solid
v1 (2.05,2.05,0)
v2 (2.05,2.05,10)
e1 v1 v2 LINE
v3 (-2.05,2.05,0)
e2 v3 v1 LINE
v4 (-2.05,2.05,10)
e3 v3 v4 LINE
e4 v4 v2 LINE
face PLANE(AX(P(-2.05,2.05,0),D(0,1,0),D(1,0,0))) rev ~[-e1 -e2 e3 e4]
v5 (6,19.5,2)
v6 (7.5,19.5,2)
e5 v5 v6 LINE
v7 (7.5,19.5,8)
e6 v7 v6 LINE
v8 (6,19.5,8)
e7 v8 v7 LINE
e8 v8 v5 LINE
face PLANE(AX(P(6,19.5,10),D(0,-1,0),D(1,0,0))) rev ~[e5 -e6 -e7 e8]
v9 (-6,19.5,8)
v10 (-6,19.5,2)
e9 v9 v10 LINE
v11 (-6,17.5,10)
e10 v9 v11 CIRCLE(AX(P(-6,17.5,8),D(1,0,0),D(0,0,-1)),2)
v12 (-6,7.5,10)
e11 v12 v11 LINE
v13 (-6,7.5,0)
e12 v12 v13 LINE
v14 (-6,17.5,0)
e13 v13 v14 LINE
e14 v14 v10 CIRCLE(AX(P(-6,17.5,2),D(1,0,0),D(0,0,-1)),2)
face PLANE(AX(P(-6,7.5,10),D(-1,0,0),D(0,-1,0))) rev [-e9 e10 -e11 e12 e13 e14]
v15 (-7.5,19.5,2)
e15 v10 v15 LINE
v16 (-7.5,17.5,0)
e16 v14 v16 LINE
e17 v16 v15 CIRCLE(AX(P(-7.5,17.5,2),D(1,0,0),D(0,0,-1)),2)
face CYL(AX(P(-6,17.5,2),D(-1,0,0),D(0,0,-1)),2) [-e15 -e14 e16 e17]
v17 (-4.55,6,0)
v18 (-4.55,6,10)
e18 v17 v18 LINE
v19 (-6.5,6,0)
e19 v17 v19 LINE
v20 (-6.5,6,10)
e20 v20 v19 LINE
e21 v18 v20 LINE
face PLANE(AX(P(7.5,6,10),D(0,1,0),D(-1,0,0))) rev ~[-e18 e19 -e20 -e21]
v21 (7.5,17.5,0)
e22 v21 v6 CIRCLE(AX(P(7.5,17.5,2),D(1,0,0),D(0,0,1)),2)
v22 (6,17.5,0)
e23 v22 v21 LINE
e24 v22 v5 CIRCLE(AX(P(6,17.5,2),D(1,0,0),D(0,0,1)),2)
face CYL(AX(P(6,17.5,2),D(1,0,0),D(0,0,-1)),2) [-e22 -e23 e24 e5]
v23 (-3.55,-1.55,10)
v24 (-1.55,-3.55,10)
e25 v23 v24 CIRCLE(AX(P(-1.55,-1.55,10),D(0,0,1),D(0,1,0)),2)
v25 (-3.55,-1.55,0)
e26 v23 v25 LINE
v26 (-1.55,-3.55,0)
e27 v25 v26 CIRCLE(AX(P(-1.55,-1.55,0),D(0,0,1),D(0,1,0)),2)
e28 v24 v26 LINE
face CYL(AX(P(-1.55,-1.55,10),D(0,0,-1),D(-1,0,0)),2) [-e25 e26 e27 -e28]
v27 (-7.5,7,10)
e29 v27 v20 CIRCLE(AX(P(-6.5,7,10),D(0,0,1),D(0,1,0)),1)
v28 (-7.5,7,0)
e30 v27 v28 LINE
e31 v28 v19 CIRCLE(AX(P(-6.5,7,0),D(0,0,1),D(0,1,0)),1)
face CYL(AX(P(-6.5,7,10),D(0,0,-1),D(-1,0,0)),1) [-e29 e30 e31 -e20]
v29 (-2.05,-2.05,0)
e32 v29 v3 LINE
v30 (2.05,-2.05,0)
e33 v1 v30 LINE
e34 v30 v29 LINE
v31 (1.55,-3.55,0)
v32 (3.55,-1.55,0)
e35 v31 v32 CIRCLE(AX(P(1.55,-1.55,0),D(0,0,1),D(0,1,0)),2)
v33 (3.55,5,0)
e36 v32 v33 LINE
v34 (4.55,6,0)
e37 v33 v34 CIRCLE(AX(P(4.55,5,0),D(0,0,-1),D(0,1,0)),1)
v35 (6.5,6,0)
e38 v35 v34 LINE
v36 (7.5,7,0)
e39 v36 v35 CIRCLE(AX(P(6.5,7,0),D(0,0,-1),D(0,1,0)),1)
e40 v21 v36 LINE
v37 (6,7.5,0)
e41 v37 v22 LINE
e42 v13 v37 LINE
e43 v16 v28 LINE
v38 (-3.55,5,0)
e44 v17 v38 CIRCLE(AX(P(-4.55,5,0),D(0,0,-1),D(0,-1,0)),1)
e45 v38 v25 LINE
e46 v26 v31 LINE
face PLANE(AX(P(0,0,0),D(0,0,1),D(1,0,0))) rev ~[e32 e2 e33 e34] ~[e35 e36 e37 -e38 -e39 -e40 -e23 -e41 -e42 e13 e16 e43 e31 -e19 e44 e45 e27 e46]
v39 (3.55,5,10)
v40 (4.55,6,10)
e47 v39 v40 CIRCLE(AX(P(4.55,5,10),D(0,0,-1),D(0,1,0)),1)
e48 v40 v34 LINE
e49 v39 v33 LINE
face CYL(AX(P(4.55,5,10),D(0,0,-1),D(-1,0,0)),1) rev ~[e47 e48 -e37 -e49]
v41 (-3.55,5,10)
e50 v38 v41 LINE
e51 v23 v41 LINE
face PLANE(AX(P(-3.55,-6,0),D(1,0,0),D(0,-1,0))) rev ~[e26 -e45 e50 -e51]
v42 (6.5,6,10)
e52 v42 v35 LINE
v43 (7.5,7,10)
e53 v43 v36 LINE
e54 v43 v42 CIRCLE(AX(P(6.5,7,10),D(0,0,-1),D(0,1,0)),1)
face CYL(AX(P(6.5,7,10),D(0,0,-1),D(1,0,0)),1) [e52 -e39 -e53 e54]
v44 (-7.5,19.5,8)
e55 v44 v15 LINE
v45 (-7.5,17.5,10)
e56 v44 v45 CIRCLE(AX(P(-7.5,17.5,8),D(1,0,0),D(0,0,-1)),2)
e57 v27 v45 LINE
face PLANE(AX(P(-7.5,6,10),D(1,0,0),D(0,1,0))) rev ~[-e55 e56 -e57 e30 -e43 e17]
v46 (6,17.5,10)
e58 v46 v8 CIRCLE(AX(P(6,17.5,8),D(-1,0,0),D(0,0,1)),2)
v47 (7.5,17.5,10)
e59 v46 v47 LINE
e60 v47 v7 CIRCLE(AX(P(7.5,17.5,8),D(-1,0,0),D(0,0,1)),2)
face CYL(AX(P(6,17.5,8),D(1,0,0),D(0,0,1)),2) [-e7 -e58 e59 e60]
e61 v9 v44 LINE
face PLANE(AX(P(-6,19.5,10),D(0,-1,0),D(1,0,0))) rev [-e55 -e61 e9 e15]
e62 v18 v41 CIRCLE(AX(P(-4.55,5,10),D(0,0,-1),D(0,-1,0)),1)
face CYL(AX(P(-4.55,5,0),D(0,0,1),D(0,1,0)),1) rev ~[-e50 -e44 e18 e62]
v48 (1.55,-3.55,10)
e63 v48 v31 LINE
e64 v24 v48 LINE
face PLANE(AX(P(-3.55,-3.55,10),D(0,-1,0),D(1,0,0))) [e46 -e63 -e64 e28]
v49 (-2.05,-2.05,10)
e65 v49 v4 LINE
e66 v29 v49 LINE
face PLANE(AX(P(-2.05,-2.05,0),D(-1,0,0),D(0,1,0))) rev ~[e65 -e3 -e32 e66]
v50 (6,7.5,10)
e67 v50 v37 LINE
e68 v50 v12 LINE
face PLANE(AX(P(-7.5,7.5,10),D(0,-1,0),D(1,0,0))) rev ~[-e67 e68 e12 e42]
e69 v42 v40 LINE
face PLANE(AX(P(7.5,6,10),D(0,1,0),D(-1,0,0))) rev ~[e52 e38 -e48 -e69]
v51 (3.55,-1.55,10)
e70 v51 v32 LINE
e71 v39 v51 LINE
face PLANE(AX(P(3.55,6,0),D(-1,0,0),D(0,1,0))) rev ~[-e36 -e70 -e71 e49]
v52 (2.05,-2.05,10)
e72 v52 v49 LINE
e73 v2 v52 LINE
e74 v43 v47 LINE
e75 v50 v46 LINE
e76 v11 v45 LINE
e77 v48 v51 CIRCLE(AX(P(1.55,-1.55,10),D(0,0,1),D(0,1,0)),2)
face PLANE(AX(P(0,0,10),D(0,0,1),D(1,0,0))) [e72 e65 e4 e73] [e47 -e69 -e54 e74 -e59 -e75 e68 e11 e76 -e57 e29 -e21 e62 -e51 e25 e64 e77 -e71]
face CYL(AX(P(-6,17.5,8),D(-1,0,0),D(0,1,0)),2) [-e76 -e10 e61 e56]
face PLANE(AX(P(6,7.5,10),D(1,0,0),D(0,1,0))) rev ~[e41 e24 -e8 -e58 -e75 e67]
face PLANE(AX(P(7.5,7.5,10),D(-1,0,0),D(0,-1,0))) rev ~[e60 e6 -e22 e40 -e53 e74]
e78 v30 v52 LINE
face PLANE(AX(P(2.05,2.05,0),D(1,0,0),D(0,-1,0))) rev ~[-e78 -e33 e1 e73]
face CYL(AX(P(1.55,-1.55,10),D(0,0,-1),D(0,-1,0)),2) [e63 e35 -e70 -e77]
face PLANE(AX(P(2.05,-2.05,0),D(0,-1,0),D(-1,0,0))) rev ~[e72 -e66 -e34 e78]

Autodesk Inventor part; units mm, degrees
ref_plane "YZ Plane" through (0, 0, 0) normal (1, 0, 0) x (0, 1, 0)
ref_plane "XZ Plane" through (0, 0, 0) normal (0, 1, 0) x (-1, 0, 0)
ref_plane "XY Plane" through (0, 0, 0) normal (0, 0, 1) x (1, 0, 0)
sketch "Sketch1" plane through (0, 0, 0) normal (0, 0, 1) x (1, 0, 0)
  line L0 (-2.05, 2.05) -> (2.05, 2.05)
  line L1 (2.05, 2.05) -> (2.05, -2.05)
  line L2 (2.05, -2.05) -> (-2.05, -2.05)
  line L3 (-2.05, -2.05) -> (-2.05, 2.05)
  line L4 (0, 2.05) -> (0, -2.05) construction
  line L5 (0, 7.5) -> (-15.55, 7.5)
  line L6 (-15.55, 7.5) -> (-15.55, 6)
  line L7 (-15.55, 6) -> (-3.55, 6)
  line L8 (-3.55, 6) -> (-3.55, -6)
  line L9 (-3.55, -6) -> (-15.55, -6)
  line L10 (-15.55, -6) -> (-15.55, -7.5)
  line L11 (-15.55, -7.5) -> (-0.55, -7.5)
  line L12 (-2.05, 0) -> (2.05, 0) construction
  line L13 (0, 7.5) -> (15.55, 7.5)
  line L14 (15.55, 7.5) -> (15.55, 6)
  line L15 (15.55, 6) -> (3.55, 6)
  line L16 (3.55, 6) -> (3.55, -6)
  line L17 (3.55, -6) -> (15.55, -6)
  line L18 (15.55, -6) -> (15.55, -7.5)
  line L19 (15.55, -7.5) -> (-0.55, -7.5)
  line L20 (-2.05, 2.05) -> (2.05, -2.05) construction
  line L21 (2.05, 2.05) -> (-2.05, -2.05) construction
  line L22 (0, 7.5) -> (0, 2.05) construction
  line L23 (-3.55, 6) -> (-3.55, 7.5)
  line L24 (-3.55, -6) -> (-3.55, -7.5)
  line L25 (3.55, 6) -> (3.55, 7.5)
  line L26 (3.55, -6) -> (3.55, -7.5)
  point P0 (0, 0)
  point P1 (0, 0)
  point P2 (0, 0)
  dimension "d3" = 4.1
  dimension "d4" = 4.1
  dimension "d5" = 12
  dimension "d6" = 1.5
  dimension "d7" = 1.5
  dimension "d8" = 5.45
  dimension "d9" = 5.45
  dimension "d10" = 1.5
  dimension "d11" = 12
  dimension "d37" = 15
extrude "Extrusion1" add sketch "Sketch1" along normal blind 10 contours L13 L25 L16 L26 L19 L11 L24 L8 L23 L5
sketch "Sketch5" plane through (0, 0, 10) normal (0, 0, 1) x (1, 0, 0)
  line L0 (6, 19.5) -> (7.5, 19.5)
  line L1 (7.5, 19.5) -> (7.5, 7.5)
  line L2 (7.5, 7.5) -> (6, 7.5)
  line L3 (6, 7.5) -> (6, 19.5)
  line L4 (3.55, 7.5) -> (-3.55, 7.5) projected
  line L5 (3.55, -7.5) -> (3.55, 7.5) projected
  line L6 (0, 0) -> (0, 23.4065) construction
  point P0 (15.55, 7.5)
  point P1 (-15.55, 7.5)
  point P2 (3.55, -6)
  point P3 (3.55, 6)
  dimension "d41" = 1.5
  dimension "d42" = 12
  dimension "d47" = 6
extrude "Extrusion5" add sketch "Sketch5" against normal up to surface (10 mm away)
mirror "Mirror1" about plane through (0, 0, 0) normal (1, 0, 0) of "Extrusion5"
sketch "Sketch7" plane through (0, 0, 10) normal (0, 0, 1) x (1, 0, 0)
  line L0 (-7.5, 19.5) -> (-7.5, 7.5) projected
  line L1 (-7.5, 7.5) -> (7.5, 7.5)
  line L2 (7.5, 7.5) -> (7.5, 6)
  line L3 (7.5, 6) -> (-7.5, 6)
  line L4 (-7.5, 6) -> (-7.5, 7.5)
  line L5 (7.5, 7.5) -> (7.5, 19.5) projected
  point P0 (0, 0)
  dimension "d53" = 1.5
extrude "Extrusion7" add sketch "Sketch7" against normal up to surface (10 mm away)
fillet "Fillet3" radius 1 4 edges at (-3.55, 6, 5) (3.55, 6, 5) (7.5, 6, 5) (-7.5, 6, 5)
sketch "Sketch8" plane through (0, 0, 10) normal (0, 0, 1) x (1, 0, 0)
  line L0 (-3.55, -3.55) -> (3.55, -3.55)
  line L1 (3.55, -3.55) -> (3.55, -7.5)
  line L2 (3.55, -7.5) -> (-3.55, -7.5)
  line L3 (-3.55, -7.5) -> (-3.55, -3.55)
  line L4 (2.05, -2.05) -> (-2.05, -2.05) projected
  line L5 (3.55, -7.5) -> (3.55, 5) projected
  line L6 (-3.55, 5) -> (-3.55, -7.5) projected
  line L7 (-3.55, -7.5) -> (3.55, -7.5) projected
  point P0 (0, 0)
  dimension "d57" = 1.5
extrude "Extrusion8" cut sketch "Sketch8" against normal blind 10
fillet "Fillet4" radius 2 4 edges at (-6.75, 19.5, 10) (-6.75, 19.5, 0) (6.75, 19.5, 0) (6.75, 19.5, 10)
fillet "Fillet5" radius 2 2 edges at (3.55, -3.55, 5) (-3.55, -3.55, 5)
equation "\"d7\" = d6"
equation "\"d8\" = d9"
properties part number "fuselage_tail_interface_airfoiled" material "ABS Plastic"
